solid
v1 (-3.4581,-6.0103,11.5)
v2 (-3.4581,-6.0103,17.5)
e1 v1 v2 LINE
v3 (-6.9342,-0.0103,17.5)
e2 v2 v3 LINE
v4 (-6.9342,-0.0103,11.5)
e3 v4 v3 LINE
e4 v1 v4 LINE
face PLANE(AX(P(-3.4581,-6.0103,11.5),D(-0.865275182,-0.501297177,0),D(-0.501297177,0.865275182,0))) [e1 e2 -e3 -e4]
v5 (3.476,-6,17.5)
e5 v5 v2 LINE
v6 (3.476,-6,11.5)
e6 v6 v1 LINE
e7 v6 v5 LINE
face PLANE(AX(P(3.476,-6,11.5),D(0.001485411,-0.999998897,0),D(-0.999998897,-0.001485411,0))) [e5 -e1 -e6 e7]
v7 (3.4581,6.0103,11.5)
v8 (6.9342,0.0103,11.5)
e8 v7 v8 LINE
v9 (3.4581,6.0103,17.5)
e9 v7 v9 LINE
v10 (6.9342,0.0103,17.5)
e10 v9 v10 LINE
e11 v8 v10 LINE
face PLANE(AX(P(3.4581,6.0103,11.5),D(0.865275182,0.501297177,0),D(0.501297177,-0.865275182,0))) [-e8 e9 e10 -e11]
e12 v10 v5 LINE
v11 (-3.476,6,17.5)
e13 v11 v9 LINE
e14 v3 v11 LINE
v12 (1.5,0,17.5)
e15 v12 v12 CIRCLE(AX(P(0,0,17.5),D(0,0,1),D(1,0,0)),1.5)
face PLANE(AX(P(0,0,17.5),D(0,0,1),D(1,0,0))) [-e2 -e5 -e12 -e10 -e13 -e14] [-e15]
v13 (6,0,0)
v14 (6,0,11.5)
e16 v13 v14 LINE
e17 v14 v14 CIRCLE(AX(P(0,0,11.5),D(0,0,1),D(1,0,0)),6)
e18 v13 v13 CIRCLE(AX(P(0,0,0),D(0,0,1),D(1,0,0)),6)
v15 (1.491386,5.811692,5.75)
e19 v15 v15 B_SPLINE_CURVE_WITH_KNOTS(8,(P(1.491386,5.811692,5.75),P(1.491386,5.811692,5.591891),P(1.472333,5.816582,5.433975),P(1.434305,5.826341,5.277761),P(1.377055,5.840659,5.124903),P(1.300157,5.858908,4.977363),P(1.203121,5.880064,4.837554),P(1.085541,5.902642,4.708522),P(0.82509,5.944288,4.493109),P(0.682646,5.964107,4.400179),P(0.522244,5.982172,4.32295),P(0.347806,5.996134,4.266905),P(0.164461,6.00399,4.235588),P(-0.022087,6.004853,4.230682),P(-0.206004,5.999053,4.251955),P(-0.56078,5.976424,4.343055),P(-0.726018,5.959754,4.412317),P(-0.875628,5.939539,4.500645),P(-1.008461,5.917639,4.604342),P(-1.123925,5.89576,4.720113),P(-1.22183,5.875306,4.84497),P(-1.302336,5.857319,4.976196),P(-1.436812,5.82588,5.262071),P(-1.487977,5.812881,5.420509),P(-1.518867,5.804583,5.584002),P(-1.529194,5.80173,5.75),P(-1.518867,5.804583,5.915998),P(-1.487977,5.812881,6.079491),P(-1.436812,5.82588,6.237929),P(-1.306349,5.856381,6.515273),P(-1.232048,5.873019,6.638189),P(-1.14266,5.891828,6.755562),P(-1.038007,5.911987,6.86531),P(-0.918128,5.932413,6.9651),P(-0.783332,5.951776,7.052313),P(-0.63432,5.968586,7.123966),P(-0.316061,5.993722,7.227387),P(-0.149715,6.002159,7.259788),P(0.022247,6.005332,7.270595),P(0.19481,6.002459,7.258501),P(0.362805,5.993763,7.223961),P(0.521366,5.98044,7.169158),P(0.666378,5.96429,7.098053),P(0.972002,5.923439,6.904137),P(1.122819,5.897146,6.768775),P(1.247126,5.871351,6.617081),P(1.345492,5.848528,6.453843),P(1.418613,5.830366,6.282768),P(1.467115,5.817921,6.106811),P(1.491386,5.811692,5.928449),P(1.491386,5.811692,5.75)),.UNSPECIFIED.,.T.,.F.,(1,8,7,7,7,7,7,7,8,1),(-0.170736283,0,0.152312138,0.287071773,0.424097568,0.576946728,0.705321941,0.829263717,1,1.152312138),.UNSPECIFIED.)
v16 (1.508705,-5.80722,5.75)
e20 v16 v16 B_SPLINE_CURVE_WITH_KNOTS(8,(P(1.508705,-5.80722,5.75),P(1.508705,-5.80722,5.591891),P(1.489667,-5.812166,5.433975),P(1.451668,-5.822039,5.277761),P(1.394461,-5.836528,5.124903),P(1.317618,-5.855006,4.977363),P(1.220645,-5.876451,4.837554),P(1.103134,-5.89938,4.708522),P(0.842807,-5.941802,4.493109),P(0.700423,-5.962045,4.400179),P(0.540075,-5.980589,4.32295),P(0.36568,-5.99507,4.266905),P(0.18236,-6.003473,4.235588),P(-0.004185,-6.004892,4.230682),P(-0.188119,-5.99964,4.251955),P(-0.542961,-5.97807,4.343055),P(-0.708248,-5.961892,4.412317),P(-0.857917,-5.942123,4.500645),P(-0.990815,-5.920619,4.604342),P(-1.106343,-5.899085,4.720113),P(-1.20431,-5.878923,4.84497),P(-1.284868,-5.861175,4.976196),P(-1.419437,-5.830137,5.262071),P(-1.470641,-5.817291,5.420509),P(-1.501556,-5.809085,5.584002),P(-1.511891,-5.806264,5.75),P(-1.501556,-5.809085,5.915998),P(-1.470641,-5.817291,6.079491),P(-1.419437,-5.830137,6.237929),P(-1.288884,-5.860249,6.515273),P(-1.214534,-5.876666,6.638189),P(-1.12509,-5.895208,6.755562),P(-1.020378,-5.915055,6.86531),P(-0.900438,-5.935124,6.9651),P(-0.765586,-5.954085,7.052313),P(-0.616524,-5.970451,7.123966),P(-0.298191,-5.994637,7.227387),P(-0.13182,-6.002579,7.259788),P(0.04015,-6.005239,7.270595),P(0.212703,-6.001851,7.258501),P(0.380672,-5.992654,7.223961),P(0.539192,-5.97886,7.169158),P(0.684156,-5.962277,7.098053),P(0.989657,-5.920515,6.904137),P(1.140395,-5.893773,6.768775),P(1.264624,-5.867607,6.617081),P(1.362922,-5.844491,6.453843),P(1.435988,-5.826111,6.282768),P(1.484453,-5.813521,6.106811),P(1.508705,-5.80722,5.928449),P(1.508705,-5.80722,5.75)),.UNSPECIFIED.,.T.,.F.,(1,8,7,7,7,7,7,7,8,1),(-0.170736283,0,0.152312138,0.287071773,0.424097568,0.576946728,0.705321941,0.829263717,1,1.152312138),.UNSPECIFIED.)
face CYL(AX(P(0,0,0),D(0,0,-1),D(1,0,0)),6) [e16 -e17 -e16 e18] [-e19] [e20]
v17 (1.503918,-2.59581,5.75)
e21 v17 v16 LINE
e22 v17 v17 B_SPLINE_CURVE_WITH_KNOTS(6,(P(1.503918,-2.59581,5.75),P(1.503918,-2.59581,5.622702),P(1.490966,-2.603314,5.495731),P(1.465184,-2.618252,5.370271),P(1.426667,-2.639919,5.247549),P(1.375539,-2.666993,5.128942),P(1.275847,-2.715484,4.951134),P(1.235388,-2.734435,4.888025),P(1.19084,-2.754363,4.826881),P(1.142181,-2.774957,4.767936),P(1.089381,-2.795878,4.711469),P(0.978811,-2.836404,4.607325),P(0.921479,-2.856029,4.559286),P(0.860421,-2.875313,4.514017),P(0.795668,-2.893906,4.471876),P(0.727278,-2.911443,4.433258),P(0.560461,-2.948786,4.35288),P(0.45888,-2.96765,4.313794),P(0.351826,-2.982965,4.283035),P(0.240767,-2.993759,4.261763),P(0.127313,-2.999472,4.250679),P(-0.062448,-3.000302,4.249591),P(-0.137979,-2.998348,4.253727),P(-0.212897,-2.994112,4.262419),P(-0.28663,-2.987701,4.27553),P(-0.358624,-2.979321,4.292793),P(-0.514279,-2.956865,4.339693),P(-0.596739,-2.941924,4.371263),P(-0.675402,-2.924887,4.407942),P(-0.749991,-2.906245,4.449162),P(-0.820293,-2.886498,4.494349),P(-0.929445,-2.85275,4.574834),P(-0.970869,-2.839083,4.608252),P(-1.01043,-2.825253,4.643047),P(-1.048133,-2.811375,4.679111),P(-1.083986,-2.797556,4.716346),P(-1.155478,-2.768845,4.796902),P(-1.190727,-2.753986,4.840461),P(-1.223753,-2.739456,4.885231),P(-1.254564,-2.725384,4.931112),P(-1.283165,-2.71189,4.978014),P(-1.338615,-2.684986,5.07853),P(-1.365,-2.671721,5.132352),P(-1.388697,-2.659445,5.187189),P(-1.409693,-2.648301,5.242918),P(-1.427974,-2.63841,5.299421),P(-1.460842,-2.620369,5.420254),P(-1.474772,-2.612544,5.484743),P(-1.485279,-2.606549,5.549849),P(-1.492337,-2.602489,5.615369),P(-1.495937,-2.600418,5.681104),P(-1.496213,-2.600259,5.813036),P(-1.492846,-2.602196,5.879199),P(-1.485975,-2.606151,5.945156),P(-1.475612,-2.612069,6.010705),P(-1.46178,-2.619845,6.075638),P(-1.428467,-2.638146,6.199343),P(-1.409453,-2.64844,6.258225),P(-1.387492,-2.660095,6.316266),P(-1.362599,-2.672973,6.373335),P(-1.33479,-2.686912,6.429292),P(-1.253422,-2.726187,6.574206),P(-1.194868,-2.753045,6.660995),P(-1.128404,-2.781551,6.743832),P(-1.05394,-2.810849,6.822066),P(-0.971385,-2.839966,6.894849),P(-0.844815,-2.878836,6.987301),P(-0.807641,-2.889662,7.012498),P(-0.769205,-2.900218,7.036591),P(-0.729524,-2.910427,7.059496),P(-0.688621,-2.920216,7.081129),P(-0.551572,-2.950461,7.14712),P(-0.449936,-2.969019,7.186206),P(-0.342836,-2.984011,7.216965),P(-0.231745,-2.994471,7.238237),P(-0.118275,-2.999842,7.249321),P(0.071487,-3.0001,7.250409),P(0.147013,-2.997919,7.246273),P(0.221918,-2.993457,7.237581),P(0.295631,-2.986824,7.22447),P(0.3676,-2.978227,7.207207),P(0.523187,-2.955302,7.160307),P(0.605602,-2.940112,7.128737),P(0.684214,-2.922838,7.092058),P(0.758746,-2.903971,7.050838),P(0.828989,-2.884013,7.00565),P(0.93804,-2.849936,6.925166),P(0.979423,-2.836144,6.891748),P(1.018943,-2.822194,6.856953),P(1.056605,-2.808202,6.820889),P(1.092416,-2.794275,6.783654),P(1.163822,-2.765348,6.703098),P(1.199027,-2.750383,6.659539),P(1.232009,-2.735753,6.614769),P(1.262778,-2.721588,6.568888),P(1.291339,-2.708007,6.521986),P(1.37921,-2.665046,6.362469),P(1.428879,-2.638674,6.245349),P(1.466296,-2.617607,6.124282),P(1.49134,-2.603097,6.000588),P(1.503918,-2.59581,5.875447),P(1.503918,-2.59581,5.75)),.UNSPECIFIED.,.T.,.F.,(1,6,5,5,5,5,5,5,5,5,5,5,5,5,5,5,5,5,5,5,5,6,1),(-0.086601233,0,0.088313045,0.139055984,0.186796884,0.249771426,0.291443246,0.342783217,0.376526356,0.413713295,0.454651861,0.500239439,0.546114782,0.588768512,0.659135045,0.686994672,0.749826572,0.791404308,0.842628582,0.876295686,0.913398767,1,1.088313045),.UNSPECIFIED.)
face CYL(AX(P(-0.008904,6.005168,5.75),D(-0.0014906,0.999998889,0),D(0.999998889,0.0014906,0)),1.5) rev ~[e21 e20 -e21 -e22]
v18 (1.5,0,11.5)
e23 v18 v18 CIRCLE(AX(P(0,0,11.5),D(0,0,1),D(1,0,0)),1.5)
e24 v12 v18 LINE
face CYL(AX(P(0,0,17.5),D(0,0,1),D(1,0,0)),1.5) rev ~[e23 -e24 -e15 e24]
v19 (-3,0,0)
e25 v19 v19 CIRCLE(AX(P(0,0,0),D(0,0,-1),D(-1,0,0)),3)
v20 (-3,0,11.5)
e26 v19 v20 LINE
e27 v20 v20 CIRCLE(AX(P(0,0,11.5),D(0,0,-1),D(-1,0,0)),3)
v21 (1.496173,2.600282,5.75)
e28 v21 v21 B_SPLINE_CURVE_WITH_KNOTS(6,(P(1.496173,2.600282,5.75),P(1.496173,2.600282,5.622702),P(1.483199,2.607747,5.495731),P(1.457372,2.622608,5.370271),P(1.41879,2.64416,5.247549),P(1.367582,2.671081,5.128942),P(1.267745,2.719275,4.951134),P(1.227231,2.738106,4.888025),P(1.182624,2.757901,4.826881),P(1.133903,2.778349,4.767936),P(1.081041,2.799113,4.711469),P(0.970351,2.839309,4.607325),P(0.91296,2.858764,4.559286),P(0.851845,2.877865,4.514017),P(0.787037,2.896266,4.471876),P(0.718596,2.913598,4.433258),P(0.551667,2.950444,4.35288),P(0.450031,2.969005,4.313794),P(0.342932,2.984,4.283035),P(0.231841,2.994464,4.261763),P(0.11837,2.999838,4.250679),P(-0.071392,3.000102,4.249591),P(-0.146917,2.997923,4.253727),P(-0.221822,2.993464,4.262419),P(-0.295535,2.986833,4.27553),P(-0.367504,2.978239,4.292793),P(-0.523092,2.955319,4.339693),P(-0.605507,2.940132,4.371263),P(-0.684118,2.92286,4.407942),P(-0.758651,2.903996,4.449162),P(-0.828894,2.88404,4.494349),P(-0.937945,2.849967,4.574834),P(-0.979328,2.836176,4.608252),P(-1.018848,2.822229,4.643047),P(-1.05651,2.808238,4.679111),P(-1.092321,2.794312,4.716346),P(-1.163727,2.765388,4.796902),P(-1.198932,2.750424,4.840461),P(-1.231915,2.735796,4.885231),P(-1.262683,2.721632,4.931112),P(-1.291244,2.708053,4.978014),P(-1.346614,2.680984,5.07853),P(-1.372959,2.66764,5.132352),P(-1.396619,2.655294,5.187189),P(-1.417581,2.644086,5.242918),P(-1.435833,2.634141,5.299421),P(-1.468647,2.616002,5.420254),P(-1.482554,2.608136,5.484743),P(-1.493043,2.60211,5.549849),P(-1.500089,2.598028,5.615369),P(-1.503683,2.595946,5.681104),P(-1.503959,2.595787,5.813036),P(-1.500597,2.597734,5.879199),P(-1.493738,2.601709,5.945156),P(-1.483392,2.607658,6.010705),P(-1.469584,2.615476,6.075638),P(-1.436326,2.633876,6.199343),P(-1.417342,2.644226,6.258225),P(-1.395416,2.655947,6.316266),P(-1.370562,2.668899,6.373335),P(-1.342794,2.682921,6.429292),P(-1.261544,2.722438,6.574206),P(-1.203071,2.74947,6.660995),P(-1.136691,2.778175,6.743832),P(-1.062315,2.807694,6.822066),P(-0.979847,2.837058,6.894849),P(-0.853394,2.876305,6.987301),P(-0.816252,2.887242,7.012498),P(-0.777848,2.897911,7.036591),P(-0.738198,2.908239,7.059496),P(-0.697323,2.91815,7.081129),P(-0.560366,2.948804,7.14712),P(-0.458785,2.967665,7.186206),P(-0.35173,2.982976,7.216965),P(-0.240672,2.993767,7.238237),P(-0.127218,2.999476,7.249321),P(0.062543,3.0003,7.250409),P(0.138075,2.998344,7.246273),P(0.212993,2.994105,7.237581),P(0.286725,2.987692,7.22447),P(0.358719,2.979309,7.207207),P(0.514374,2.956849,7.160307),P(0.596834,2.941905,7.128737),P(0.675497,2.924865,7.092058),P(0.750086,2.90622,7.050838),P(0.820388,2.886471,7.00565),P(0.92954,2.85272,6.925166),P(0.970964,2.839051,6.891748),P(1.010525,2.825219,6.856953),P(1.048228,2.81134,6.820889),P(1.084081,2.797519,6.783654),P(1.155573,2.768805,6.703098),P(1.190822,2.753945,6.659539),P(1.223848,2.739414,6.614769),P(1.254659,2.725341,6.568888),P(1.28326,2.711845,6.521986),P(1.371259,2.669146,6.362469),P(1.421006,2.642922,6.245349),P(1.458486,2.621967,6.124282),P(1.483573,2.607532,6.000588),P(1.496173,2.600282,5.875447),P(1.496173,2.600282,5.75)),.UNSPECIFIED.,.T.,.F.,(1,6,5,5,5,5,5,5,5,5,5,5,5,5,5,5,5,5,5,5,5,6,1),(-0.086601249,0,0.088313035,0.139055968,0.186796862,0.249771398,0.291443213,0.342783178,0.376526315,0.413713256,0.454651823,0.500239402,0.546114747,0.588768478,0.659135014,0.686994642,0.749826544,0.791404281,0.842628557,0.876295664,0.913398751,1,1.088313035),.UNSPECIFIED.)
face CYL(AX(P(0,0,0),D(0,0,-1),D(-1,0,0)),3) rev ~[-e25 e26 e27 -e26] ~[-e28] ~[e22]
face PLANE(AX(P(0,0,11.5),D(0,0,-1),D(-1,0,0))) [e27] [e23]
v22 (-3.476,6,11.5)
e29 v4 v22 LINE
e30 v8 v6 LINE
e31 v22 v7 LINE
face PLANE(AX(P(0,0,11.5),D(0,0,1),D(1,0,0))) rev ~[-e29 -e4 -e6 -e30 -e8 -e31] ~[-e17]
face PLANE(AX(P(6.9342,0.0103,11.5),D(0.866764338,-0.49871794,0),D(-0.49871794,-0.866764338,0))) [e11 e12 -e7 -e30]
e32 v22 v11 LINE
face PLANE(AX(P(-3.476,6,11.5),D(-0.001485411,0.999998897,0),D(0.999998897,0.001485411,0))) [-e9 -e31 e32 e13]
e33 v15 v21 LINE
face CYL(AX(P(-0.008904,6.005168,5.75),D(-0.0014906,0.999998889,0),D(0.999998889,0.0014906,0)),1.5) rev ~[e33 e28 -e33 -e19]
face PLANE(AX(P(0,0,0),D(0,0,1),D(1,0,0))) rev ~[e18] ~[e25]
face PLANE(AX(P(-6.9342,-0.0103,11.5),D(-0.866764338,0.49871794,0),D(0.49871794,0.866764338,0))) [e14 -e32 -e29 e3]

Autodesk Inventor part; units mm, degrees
ref_plane "YZ Plane" through (0, 0, 0) normal (1, 0, 0) x (0, 1, 0)
ref_plane "XZ Plane" through (0, 0, 0) normal (0, 1, 0) x (-1, 0, 0)
ref_plane "XY Plane" through (0, 0, 0) normal (0, 0, 1) x (1, 0, 0)
sketch "Sketch2" plane through (0, 0, 0) normal (0, 0, 1) x (1, 0, 0)
  circle A0 centre (0, 0) radius 6
  dimension "d3" = 12
extrude "Extrusion2" add sketch "Sketch2" along normal blind 11.5
sketch "Sketch3" plane through (0, 0, 11.5) normal (0, 0, 1) x (1, 0, 0)
  line L0 (-3.476, 6) -> (3.4581, 6.0103)
  line L1 (3.4581, 6.0103) -> (6.9342, 0.0103)
  line L2 (6.9342, 0.0103) -> (3.476, -6)
  line L3 (3.476, -6) -> (-3.4581, -6.0103)
  line L4 (-3.4581, -6.0103) -> (-6.9342, -0.0103)
  line L5 (-6.9342, -0.0103) -> (-3.476, 6)
  point P0 (0, 0)
  point P1 (0, 0)
sketch "Sketch4" plane through (0, 0, 0) normal (0, 0, -1) x (-1, 0, 0)
  circle A0 centre (0, 0) radius 3
  dimension "d6" = 6
extrude "Extrusion3" add sketch "Sketch3" along normal blind 6
extrude "Extrusion4" cut sketch "Sketch4" against normal up to surface (11.5 mm away)
sketch "Sketch5" plane through (-3.476, 6, 17.5) normal (-0.0014906, 0.9999989, 0) x (0.9999989, 0.0014906, 0)
  line L0 (0, 0) -> (-3.4671, 0) projected
  line L1 (6.9342, 6) -> (6.9342, 0) projected
  line L2 (0, 0) -> (6.9342, 0)
  line L3 (6.9342, 0) -> (6.9342, 6)
  line L4 (6.9342, 6) -> (0, 6)
  line L5 (0, 6) -> (0, 0)
  line L6 (3.4671, 0) -> (3.4671, 17.5) construction
  line L7 (6.9342, 6) -> (0, 6) construction
  line L8 (6.9342, 6) -> (0, 6) construction
  circle A0 centre (3.4671, 11.75) radius 1.5
  dimension "d11" = 3
extrude "Extrusion5" cut sketch "Sketch5" against normal through all contours A0
sketch "Sketch6" plane through (0, 0, 17.5) normal (0, 0, 1) x (1, 0, 0)
  circle A0 centre (0, 0) radius 1.5
  dimension "d14" = 3
extrude "Extrusion6" cut sketch "Sketch6" against normal blind 10
properties part number "Wheel Test" material "Brass"
